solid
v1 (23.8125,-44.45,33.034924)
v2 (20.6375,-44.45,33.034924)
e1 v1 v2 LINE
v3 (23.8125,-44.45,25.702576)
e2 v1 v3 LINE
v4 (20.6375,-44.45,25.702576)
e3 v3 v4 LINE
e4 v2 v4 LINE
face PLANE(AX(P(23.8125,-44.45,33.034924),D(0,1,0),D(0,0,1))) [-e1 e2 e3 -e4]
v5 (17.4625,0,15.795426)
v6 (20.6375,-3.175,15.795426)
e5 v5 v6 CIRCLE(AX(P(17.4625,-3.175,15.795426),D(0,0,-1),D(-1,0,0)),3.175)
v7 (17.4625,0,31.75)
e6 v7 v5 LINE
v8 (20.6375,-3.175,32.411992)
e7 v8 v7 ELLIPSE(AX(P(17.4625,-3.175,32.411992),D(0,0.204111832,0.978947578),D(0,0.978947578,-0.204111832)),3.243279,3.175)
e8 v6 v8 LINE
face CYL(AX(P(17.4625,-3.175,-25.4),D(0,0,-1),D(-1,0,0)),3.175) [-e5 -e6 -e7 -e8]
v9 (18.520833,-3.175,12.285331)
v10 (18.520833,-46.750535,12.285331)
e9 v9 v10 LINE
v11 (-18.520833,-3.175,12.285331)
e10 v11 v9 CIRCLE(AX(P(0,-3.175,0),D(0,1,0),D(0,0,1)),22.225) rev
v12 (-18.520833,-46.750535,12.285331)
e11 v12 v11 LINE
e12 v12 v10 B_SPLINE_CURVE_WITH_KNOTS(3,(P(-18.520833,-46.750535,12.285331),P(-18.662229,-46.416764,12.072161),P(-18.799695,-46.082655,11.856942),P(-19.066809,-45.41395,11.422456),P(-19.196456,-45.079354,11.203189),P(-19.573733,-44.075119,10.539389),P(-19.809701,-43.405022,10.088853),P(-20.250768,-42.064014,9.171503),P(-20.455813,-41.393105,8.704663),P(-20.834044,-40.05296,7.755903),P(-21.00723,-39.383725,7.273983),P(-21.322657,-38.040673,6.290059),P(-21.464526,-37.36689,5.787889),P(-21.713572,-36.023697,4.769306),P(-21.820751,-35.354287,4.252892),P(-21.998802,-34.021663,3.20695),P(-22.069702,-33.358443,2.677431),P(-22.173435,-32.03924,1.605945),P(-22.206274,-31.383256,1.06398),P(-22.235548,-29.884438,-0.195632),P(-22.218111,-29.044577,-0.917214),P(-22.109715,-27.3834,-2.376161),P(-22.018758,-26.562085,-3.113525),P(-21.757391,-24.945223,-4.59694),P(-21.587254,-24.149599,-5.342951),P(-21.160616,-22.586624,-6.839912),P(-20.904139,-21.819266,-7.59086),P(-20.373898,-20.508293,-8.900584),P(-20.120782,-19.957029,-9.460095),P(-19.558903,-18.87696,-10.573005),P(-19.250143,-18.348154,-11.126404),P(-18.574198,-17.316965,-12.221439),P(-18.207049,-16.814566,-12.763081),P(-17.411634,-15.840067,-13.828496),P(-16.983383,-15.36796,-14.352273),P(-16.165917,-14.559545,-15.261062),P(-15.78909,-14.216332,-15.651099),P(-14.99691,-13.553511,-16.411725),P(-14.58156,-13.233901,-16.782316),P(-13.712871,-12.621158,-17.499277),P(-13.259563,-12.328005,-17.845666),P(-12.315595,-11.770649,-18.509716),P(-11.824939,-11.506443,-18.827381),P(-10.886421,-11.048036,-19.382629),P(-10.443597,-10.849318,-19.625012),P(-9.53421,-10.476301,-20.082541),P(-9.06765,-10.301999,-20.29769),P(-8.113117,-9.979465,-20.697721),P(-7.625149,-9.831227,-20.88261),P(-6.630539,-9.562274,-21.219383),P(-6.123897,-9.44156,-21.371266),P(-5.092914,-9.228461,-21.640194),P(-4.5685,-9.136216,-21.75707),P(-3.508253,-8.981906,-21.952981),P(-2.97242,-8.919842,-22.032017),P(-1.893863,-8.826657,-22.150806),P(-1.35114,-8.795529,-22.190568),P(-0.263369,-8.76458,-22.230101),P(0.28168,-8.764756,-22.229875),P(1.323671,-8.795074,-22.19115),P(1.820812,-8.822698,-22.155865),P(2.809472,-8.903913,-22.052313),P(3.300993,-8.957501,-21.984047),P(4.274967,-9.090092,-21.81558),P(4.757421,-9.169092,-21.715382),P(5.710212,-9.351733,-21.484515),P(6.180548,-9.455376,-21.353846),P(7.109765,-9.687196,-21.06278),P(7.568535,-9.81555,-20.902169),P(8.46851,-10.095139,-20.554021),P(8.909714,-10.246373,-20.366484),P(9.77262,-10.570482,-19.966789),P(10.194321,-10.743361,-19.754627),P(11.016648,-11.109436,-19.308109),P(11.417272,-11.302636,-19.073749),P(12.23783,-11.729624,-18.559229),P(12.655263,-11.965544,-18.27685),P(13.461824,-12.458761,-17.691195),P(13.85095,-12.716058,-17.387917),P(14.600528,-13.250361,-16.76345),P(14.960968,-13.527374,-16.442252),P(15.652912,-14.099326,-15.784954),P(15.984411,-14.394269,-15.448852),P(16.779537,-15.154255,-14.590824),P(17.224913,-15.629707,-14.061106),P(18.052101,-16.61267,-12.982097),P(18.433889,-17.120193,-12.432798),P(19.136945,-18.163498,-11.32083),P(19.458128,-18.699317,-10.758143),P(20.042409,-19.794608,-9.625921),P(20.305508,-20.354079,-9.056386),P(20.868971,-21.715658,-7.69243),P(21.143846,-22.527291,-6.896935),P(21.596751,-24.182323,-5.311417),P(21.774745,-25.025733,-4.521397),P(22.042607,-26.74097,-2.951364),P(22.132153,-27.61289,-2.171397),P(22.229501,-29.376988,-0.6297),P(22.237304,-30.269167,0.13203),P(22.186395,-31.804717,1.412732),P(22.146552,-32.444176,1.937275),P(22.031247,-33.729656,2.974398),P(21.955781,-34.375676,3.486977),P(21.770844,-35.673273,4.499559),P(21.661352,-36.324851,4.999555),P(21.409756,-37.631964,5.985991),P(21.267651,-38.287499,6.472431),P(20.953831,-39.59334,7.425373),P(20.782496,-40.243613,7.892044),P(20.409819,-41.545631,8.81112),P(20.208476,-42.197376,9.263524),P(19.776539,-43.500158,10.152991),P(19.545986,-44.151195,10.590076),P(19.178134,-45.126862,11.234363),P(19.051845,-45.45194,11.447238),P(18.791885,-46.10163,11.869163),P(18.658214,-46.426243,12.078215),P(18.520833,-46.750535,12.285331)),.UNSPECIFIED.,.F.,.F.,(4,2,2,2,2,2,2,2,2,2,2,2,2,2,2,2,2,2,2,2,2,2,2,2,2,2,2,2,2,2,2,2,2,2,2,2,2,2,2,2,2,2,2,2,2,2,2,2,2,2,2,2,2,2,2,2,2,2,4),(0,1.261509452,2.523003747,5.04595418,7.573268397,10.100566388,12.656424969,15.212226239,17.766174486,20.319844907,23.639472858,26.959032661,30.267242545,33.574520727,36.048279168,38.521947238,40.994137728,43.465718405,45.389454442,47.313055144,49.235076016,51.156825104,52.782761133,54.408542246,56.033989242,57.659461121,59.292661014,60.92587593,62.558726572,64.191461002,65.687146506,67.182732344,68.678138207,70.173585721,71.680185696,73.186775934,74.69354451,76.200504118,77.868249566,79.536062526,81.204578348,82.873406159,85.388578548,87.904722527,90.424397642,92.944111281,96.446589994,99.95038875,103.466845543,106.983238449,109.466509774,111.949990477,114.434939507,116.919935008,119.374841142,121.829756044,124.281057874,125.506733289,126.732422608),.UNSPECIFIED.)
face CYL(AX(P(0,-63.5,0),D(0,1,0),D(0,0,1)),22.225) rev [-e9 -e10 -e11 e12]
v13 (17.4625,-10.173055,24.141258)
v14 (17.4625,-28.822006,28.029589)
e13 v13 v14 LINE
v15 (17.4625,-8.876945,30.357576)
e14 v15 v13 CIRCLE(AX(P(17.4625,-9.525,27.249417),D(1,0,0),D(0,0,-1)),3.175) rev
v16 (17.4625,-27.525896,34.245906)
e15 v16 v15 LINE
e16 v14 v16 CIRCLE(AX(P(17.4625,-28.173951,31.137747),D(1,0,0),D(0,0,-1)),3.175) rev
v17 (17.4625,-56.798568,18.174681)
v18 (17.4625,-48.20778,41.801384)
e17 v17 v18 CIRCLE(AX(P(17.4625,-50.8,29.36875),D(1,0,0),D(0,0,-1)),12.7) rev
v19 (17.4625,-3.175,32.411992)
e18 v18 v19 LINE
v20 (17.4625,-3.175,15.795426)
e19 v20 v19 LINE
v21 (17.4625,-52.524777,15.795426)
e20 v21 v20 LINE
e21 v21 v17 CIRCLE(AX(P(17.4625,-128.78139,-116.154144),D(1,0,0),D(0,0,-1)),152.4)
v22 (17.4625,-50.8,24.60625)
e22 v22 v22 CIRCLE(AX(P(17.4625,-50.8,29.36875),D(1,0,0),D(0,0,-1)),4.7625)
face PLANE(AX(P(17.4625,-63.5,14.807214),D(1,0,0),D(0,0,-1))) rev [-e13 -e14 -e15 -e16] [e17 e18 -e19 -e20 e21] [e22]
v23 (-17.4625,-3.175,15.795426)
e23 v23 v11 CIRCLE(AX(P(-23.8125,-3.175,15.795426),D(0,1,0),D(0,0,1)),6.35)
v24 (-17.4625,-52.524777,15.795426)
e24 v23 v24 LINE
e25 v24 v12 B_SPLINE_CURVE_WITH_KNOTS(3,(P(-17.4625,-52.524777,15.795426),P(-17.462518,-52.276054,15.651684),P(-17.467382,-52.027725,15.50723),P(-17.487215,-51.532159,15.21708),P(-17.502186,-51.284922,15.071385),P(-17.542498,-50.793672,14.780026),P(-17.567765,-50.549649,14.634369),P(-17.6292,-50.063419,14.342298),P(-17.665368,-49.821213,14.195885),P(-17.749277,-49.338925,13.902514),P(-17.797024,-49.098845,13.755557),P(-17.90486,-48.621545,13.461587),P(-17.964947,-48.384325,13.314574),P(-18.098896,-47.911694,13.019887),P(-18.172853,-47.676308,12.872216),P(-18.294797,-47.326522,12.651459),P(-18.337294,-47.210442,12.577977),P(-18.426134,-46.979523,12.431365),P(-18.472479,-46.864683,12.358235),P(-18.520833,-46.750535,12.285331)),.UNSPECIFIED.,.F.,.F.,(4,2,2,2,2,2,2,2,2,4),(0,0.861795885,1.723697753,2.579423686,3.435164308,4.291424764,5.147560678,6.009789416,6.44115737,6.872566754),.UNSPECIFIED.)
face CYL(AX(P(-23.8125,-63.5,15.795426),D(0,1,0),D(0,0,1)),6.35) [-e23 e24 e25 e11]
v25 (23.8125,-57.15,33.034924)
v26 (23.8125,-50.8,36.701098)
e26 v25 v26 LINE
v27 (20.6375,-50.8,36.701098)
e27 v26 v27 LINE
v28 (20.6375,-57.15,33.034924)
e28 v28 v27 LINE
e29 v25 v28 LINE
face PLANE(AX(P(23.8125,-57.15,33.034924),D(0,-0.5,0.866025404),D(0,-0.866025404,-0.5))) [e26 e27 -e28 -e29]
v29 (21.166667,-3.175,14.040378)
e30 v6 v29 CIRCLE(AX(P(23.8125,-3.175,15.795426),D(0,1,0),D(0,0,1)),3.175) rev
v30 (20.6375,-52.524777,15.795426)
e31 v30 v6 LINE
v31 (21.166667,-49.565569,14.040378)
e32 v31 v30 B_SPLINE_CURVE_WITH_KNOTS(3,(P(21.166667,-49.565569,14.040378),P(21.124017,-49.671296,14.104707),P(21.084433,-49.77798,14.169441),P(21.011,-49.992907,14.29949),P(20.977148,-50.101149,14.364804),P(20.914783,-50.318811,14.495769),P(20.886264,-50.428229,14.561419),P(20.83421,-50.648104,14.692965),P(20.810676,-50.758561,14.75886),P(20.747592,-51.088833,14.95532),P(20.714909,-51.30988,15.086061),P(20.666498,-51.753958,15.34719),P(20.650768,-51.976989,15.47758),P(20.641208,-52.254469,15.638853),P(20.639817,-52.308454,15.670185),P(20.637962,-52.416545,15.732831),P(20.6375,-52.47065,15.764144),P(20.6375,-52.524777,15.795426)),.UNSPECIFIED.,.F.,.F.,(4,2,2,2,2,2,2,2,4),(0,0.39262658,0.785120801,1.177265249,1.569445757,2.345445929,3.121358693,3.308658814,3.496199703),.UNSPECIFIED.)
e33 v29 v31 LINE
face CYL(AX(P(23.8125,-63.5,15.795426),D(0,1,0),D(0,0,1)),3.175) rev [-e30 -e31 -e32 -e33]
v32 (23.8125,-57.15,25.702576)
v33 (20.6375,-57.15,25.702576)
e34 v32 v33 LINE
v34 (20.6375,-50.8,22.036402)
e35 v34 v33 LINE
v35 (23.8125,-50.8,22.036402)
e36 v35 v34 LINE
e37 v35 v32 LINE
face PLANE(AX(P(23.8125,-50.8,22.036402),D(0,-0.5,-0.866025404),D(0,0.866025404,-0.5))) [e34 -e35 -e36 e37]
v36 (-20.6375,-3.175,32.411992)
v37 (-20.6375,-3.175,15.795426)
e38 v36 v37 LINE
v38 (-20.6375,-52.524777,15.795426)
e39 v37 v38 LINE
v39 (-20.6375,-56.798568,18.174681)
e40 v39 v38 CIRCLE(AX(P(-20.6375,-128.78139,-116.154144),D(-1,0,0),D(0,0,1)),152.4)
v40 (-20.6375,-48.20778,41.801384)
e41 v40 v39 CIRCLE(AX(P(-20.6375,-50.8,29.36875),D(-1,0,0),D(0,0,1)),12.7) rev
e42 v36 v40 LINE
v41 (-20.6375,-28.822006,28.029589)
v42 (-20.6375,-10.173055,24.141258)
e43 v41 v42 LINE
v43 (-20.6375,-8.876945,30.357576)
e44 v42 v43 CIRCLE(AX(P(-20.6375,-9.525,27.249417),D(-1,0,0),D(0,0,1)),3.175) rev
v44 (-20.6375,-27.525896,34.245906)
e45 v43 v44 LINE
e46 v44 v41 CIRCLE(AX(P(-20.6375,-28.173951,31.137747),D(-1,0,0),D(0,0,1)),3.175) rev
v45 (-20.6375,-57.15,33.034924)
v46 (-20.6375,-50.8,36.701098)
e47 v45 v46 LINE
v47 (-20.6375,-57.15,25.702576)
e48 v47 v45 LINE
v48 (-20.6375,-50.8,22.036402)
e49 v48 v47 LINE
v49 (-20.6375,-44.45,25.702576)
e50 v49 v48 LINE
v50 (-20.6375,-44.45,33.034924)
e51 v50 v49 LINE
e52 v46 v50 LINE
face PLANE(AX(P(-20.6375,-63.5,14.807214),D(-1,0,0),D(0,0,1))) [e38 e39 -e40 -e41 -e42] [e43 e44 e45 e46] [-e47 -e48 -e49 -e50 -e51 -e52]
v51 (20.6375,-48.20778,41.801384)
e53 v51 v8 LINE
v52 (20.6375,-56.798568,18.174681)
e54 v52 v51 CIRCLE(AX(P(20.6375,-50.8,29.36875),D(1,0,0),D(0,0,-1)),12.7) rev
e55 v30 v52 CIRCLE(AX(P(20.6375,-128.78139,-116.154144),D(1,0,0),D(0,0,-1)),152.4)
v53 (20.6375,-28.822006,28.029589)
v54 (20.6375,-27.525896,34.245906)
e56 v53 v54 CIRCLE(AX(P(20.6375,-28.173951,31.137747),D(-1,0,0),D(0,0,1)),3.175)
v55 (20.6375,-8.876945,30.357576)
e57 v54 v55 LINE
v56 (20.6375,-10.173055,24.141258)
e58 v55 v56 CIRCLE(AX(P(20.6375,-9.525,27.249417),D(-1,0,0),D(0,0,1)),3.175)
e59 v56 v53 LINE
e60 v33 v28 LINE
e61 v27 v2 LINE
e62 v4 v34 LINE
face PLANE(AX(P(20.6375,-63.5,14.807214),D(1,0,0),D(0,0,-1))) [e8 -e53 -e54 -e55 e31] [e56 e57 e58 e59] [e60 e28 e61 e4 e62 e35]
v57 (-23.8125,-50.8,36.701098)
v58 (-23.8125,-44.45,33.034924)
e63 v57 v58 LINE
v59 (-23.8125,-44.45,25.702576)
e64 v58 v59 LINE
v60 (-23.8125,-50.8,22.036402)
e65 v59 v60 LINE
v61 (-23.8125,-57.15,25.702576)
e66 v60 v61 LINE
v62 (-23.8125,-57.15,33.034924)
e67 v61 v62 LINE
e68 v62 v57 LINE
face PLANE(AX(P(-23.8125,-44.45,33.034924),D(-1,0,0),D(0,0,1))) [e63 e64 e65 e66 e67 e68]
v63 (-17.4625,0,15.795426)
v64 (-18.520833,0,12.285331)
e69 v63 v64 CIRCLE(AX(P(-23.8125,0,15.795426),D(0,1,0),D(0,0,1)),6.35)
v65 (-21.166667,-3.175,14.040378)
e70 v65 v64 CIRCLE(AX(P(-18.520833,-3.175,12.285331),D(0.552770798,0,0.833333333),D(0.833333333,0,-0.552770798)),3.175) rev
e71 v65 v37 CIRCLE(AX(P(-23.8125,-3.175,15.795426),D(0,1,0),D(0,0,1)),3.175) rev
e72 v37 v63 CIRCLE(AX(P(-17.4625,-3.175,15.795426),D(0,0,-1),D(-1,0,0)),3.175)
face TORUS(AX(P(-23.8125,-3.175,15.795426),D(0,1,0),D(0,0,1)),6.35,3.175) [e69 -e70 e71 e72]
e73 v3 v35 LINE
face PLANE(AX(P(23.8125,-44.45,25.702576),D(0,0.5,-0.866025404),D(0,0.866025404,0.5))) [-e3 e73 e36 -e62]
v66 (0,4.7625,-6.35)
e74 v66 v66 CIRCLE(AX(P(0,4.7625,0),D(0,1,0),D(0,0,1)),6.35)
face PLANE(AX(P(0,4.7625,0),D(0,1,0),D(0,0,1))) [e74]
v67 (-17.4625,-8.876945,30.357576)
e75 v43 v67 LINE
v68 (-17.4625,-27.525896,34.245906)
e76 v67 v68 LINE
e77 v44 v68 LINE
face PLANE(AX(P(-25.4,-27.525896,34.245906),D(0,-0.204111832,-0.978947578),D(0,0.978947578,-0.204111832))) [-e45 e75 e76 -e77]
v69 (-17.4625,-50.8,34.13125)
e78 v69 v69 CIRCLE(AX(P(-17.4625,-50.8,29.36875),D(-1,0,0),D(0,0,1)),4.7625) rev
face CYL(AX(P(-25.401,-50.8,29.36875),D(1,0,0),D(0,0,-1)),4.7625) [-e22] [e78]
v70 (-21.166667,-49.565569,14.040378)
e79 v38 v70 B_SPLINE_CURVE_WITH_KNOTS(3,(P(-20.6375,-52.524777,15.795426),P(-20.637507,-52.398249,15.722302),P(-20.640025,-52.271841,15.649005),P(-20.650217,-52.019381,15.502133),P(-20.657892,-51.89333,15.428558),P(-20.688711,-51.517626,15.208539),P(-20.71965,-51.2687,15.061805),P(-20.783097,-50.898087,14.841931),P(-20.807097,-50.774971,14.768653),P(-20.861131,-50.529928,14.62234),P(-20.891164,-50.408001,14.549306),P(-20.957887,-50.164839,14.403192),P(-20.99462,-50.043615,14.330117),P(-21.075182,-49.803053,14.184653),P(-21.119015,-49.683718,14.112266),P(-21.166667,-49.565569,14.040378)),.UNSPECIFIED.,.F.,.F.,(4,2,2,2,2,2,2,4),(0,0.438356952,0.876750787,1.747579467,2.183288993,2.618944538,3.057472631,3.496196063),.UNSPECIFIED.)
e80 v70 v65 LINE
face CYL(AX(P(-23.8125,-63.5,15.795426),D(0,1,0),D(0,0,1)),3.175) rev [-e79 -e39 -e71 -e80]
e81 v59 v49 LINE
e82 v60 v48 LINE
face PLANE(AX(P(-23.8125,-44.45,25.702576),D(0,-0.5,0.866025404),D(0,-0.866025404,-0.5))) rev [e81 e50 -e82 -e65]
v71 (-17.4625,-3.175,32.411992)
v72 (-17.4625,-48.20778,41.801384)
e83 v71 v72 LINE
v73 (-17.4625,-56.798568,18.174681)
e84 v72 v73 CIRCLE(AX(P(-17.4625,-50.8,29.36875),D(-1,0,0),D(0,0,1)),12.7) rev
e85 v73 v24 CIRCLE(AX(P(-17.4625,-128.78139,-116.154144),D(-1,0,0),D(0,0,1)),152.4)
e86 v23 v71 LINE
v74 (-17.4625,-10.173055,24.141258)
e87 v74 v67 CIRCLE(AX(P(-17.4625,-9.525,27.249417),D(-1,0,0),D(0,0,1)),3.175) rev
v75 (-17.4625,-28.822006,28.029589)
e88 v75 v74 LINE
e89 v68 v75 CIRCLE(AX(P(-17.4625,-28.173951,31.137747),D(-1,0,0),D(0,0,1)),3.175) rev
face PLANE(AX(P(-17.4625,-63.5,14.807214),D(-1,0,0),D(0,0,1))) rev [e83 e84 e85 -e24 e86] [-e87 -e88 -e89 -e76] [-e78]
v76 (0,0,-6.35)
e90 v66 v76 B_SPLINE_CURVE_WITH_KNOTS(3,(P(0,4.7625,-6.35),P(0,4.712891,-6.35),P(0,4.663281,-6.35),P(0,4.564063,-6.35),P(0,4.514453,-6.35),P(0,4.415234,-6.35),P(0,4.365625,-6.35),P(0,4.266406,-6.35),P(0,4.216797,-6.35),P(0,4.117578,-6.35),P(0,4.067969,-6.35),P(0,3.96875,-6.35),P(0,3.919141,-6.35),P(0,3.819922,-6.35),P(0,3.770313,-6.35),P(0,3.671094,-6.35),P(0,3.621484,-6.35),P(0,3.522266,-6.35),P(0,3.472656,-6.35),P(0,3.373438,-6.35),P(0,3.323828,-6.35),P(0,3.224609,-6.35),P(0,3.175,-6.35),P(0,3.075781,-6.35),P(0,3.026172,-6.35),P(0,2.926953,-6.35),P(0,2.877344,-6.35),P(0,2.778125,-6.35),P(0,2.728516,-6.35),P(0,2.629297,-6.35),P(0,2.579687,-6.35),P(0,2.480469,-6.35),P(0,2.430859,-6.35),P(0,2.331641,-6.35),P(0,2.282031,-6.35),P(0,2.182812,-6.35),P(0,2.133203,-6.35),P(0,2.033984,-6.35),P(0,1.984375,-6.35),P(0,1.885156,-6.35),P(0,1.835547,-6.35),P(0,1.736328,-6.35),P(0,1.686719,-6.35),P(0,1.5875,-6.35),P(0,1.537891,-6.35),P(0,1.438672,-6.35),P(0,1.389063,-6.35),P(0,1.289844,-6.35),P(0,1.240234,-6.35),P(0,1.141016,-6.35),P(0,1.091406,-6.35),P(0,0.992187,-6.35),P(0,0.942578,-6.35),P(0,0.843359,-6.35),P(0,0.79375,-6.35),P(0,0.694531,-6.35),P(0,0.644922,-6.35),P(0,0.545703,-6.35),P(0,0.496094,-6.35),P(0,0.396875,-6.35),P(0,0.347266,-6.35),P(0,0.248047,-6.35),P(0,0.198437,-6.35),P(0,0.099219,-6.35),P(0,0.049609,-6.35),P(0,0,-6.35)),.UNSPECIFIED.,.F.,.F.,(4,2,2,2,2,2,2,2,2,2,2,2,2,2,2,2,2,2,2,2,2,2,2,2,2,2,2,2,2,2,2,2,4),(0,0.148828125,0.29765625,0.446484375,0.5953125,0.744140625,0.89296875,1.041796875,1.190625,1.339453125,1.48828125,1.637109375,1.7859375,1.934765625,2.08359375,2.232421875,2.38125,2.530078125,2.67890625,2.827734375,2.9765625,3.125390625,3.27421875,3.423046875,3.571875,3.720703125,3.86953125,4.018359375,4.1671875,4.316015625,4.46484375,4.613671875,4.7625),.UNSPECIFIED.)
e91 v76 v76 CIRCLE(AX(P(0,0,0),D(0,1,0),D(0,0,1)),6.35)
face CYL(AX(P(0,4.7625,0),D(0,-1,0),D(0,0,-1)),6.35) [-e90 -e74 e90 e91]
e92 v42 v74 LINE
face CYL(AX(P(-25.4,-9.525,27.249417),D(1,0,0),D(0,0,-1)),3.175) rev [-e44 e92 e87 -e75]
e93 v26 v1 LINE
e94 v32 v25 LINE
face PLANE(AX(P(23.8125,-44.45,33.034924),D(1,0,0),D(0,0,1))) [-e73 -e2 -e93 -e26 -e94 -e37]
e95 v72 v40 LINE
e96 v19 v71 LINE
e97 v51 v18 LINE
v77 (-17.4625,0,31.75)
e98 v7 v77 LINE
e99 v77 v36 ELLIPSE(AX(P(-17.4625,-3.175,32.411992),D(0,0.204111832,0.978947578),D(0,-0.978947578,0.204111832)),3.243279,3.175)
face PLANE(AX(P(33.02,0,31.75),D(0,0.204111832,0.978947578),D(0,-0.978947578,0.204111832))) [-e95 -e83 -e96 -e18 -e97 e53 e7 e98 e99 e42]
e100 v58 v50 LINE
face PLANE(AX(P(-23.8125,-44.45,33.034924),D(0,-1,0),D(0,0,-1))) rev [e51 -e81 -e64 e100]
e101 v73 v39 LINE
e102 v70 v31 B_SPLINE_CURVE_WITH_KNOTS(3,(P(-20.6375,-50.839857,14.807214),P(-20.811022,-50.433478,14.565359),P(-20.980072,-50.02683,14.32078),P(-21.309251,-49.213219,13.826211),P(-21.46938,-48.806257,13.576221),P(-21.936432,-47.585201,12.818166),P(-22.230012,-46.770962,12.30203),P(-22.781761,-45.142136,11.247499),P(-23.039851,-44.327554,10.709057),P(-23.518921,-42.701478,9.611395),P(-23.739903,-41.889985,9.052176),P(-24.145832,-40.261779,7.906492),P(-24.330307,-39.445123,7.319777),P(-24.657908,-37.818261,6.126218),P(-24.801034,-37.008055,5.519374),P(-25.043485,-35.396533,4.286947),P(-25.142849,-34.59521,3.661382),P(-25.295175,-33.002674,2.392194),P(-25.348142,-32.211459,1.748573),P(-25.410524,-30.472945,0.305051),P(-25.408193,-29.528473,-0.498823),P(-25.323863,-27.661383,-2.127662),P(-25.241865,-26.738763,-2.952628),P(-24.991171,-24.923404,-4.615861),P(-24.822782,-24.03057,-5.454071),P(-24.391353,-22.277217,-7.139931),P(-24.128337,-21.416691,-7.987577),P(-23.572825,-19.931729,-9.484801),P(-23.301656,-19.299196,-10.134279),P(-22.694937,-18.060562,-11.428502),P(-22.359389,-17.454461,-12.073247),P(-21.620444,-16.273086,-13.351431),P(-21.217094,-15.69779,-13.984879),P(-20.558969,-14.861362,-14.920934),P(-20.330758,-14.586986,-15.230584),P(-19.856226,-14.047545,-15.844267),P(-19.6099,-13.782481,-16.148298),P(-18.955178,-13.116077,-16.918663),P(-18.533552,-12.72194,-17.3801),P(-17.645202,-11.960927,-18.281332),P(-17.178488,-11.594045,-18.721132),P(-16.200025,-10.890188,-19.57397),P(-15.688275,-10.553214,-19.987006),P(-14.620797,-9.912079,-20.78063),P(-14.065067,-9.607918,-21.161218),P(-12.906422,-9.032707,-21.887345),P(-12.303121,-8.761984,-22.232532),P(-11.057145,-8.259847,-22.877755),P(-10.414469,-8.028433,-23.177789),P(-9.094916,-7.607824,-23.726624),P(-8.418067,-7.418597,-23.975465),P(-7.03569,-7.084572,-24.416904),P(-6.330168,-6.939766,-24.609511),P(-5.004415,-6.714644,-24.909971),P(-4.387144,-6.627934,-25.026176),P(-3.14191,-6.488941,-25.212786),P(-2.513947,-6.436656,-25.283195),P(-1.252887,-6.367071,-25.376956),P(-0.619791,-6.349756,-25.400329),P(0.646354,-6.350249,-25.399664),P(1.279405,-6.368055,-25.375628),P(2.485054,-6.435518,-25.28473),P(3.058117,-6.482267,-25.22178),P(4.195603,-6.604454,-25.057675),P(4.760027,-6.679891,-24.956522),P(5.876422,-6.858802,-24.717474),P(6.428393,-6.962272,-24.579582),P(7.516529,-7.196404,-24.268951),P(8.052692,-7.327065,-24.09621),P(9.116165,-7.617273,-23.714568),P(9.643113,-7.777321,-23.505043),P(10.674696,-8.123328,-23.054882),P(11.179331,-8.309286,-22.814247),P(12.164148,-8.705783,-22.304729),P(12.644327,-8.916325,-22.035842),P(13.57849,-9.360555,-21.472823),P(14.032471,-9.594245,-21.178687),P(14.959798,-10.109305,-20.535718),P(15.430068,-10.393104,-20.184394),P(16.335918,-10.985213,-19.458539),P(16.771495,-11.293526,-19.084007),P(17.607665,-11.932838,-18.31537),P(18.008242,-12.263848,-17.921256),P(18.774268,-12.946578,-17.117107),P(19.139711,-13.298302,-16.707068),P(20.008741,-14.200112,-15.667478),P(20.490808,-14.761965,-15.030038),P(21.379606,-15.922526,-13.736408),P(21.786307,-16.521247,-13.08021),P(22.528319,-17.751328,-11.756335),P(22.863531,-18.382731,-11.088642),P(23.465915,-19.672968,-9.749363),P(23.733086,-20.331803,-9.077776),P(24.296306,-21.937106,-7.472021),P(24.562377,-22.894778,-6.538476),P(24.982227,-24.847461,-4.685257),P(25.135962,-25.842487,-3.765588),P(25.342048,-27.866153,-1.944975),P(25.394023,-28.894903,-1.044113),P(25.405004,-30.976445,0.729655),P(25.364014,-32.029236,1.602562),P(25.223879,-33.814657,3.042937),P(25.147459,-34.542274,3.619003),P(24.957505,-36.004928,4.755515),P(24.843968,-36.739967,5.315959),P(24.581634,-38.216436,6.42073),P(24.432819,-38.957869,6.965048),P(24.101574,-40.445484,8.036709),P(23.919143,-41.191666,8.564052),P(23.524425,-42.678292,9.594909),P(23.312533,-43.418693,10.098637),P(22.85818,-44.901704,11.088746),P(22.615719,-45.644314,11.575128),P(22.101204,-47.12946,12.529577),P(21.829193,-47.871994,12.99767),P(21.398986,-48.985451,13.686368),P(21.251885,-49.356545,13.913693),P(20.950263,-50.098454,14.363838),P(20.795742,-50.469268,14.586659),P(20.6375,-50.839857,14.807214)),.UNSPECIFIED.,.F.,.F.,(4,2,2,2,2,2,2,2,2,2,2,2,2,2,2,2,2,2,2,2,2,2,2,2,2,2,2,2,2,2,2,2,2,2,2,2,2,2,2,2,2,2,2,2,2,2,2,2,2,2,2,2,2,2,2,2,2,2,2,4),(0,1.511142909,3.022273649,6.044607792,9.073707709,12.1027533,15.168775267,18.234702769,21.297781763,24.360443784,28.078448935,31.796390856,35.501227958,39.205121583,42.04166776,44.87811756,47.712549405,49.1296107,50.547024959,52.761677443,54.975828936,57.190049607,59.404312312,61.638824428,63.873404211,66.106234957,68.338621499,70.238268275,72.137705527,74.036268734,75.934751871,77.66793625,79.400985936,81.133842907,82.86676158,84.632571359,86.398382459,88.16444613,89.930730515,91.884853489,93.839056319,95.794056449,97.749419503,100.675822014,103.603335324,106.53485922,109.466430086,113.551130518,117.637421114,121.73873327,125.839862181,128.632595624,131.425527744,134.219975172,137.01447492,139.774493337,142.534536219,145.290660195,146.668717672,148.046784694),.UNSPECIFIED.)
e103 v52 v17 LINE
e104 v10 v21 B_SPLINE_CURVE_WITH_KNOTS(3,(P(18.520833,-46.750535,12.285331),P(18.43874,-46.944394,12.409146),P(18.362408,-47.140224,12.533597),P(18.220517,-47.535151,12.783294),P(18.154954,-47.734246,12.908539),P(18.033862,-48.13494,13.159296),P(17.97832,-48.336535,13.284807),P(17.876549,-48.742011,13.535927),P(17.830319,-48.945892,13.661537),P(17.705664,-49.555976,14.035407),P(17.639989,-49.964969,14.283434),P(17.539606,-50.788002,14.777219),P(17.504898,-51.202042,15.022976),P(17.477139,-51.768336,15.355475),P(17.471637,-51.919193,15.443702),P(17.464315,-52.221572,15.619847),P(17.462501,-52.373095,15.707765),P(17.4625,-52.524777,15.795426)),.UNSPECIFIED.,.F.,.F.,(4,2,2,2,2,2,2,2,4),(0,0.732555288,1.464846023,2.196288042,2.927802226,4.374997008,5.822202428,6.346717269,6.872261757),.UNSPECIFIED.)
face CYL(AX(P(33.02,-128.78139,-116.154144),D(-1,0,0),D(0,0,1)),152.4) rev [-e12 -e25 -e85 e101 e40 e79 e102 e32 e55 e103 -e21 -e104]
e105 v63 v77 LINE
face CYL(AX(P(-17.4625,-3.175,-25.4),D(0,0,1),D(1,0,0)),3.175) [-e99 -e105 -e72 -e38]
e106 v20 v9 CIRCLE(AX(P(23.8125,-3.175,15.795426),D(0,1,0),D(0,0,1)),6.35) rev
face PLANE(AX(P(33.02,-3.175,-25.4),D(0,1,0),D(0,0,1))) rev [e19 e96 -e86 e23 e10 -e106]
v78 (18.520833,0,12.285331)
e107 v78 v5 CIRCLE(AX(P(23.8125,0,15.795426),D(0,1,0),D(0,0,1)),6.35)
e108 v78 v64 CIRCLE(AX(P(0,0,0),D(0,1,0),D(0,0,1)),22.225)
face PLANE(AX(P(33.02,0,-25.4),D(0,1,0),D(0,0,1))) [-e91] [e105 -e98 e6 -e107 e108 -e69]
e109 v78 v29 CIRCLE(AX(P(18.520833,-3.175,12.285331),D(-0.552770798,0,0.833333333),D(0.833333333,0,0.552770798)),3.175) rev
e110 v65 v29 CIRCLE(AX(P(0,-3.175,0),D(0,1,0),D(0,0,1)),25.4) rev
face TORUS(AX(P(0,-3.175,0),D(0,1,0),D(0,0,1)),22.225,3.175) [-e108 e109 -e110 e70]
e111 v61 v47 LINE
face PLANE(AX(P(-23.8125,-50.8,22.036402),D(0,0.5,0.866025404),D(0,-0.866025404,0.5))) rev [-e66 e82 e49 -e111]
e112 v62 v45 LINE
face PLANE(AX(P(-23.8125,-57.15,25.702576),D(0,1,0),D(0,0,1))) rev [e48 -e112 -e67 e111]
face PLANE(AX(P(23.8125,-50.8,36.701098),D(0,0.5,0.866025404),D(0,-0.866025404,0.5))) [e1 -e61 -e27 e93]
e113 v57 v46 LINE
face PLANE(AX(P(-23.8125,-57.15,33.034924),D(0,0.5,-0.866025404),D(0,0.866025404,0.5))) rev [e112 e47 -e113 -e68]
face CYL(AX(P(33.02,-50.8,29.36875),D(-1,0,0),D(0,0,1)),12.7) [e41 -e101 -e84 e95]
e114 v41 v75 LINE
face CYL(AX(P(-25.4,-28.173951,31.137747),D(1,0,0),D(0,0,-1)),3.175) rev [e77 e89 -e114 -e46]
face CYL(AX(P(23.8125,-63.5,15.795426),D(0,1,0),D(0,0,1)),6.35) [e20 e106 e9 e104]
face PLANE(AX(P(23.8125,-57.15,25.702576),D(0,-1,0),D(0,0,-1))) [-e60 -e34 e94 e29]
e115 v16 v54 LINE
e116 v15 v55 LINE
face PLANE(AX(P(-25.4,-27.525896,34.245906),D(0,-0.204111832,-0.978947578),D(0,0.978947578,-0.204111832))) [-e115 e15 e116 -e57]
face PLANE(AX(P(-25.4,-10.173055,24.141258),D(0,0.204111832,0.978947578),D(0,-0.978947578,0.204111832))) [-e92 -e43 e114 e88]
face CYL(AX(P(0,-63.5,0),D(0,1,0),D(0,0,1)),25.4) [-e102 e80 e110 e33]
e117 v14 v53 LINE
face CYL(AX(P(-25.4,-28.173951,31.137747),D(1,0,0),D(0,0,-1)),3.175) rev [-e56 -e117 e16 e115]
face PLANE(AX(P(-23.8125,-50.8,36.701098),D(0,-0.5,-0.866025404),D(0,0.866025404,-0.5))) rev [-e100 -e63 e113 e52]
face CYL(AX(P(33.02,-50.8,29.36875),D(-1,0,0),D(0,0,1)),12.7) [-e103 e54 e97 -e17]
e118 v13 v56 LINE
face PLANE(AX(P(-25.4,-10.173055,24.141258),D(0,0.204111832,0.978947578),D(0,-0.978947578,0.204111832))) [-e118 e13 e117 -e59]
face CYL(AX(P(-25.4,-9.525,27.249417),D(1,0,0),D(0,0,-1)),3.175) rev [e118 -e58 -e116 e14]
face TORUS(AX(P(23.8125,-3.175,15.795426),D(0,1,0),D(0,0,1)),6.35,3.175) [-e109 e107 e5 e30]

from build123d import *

# Parameters (mm, degrees)
BASE_EXTRUDE_DEPTH              = 33.02
SKETCH3_OUTSIDE_W               = 90.796
SKETCH3_OUTSIDE_H               = 92.225
CUT_EXTRUDE1_DEPTH              = 84.020179032
FILLET1_R                       = 3.175
SHELL1_START                    = -64
SHELL1_DEPTH                    = 60.825
CUT_EXTRUDE2_DEPTH              = 90.002703004
BOSS_EXTRUDE2_REACH             = 82.294
SKETCH5_R                       = 4.7625
BOSS_EXTRUDE2_DIRECTION_2_REACH = 82.294
BOSS_EXTRUDE3_DEPTH             = 3.175
SKETCH7_R                       = 6.35
BOSS_EXTRUDE4_DEPTH             = 4.7625


with BuildPart() as part:
    # Sketch2 → Base-Extrude (new, symmetric)
    with BuildSketch(Plane.ZY):
        with BuildLine():
            Line((-25.4, 0), (31.75, 0))
            Line((31.75, 0), (41.801384237, -48.20777973))
            ThreePointArc((41.801384237, -48.20777973), (33.708556891, -62.735496477), (18.174681196, -56.798568464))
            ThreePointArc((18.174681196, -56.798568464), (-0.820496403, -29.162568375), (-25.4, -6.35))
            Line((-25.4, -6.35), (-25.4, 0))
        make_face()
    extrude(amount=BASE_EXTRUDE_DEPTH, both=True)

    # Sketch3 outside → Cut-Extrude1 (cut, through all)
    with BuildSketch(Plane(origin=(0, 0, 0), x_dir=(-1, 0, 0), z_dir=(0, 1, 0))):
        with Locations((0, 8.3345)):
            Rectangle(SKETCH3_OUTSIDE_W, SKETCH3_OUTSIDE_H)
        with BuildLine():
            Line((20.6375, 14.807214247), (20.6375, 48.151384237))
            Line((20.6375, 48.151384237), (-20.6375, 48.151384237))
            Line((-20.6375, 48.151384237), (-20.6375, 14.807214247))
            ThreePointArc((-20.6375, 14.807214247), (0, -25.4), (20.6375, 14.807214247))
        make_face(mode=Mode.SUBTRACT)
    extrude(amount=-CUT_EXTRUDE1_DEPTH, mode=Mode.SUBTRACT)

    # Fillet1
    # the kernel refuses this fillet: 3.175 mm, written as the material it adds along each edge
    with BuildSketch(Plane(origin=(20.6375, 0, 14.807214247), x_dir=(0.567961525786319, 0, -0.8230551046111534), z_dir=(0, -1, 0))) as fillet1_piece_1_section:
        with BuildLine():
            CenterArc((0.989925475, 3.174465965), FILLET1_R, 235.391801271, 33.557309762)
            Line((-0.813352369, 0.561266008), (0, 0))
            ThreePointArc((0, 0), (0.465847282, 0.004272282), (0.931694565, 0))
        make_face()
    fillet1_piece_1 = extrude(amount=53.310385567, mode=Mode.PRIVATE)
    fillet1_piece_1 = fillet1_piece_1 - Plane(origin=(20.6375, -128.781390034, -116.154144448), x_dir=(0, 0.4723282255219985, 0.8814227404459453), z_dir=(-1, 0, 0)) * Cylinder(152.4, 111, mode=Mode.PRIVATE)
    add(fillet1_piece_1)
    with BuildSketch(Plane(origin=(-20.6375, 0, 14.807214247), x_dir=(-0.5679615257863165, 0, -0.8230551046111549), z_dir=(0, -1, 0))) as fillet1_piece_2_section:
        with BuildLine():
            CenterArc((0.989925475, -3.174465965), FILLET1_R, 91.050888967, 33.557309762)
            Line((-0.813352369, -0.561266008), (0, 0))
            ThreePointArc((0, 0), (0.465847282, -0.004272282), (0.931694565, 0))
        make_face()
    fillet1_piece_2 = extrude(amount=53.310385567, mode=Mode.PRIVATE)
    fillet1_piece_2 = fillet1_piece_2 - Plane(origin=(-20.6375, -128.781390034, -116.154144448), x_dir=(0, 0.4723282255219985, 0.8814227404459453), z_dir=(-1, 0, 0)) * Cylinder(152.4, 111, mode=Mode.PRIVATE)
    add(fillet1_piece_2)
    # the kernel refuses this fillet: 3.175 mm, written as the material it takes off along each edge
    with BuildSketch(Plane(origin=(0, 0, 0), x_dir=(-0.8333333333333335, 0, 0.5527707983925666), z_dir=(0.5527707983925666, 0, 0.8333333333333335))) as fillet1_2_piece_1:
        with BuildLine():
            CenterArc((25.4 - FILLET1_R, FILLET1_R), FILLET1_R, 270, 90)
            Line((25.4 - FILLET1_R, 0), (25.4, 0))
            Line((25.4, 0), (25.4, FILLET1_R))
        make_face()
    revolve(axis=Axis((0, 0, 0), (0, -1, 0)), revolution_arc=247.114619524, mode=Mode.SUBTRACT)
    with BuildSketch(Plane(origin=(20.6375, 0, 39.6875), x_dir=(-1, 0, 0), z_dir=(0, 0, -1)), Plane(origin=(-20.6375, 0, 15.795425564), x_dir=(1, 0, 0), z_dir=(0, 0, 1))) as fillet1_2_piece_2:
        with BuildLine():
            CenterArc((FILLET1_R, -FILLET1_R), FILLET1_R, 90, 90)
            Line((0, -FILLET1_R), (0, 0))
            Line((0, 0), (FILLET1_R, 0))
        make_face()
    extrude(amount=23.892074436, mode=Mode.SUBTRACT)
    with BuildSketch(Plane(origin=(-23.8125, 0, 15.795425564), x_dir=(0.8333333333333333, 0, -0.5527707983925668), z_dir=(-0.5527707983925668, 0, -0.8333333333333333))) as fillet1_2_piece_3:
        with BuildLine():
            CenterArc((3.175 + FILLET1_R, FILLET1_R), FILLET1_R, 180, 90)
            Line((3.175, FILLET1_R), (3.175, 0))
            Line((3.175, 0), (3.175 + FILLET1_R, 0))
        make_face()
    revolve(axis=Axis((-23.8125, 0, 15.795425564), (0, -1, 0)), revolution_arc=33.557309762, mode=Mode.SUBTRACT)
    with BuildSketch(Plane(origin=(23.8125, 0, 15.795425564), x_dir=(-0.8333333333333333, 0, -0.5527707983925668), z_dir=(0.5527707983925668, 0, -0.8333333333333333))) as fillet1_2_piece_4:
        with BuildLine():
            CenterArc((3.175 + FILLET1_R, -FILLET1_R), FILLET1_R, 90, 90)
            Line((3.175, -FILLET1_R), (3.175, 0))
            Line((3.175, 0), (3.175 + FILLET1_R, 0))
        make_face()
    revolve(axis=Axis((23.8125, 0, 15.795425564), (0, 1, 0)), revolution_arc=33.557309762, mode=Mode.SUBTRACT)

    # Shell1: read off the stored shape, not the designer's step
    # Shell1 outline → Shell1 (cut)
    with BuildSketch(Plane(origin=(0, 0, 0), x_dir=(1, 0, 0), z_dir=(0, 1, 0)).offset(SHELL1_START)):
        with BuildLine():
            ThreePointArc((17.4625, -15.795425564), (17.732837866, -13.962338459), (18.520833333, -12.285330994))
            ThreePointArc((18.520833333, -12.285330994), (0, 22.225), (-18.520833333, -12.285330994))
            ThreePointArc((-18.520833333, -12.285330994), (-17.732837866, -13.962338459), (-17.4625, -15.795425564))
            Line((-17.4625, -15.795425564), (-17.4625, -44))
            Line((-17.4625, -44), (17.4625, -44))
            Line((17.4625, -44), (17.4625, -15.795425564))
        make_face()
    extrude(amount=SHELL1_DEPTH, mode=Mode.SUBTRACT)

    # Sketch4 → Cut-Extrude2 (cut, through all)
    with BuildSketch(Plane.ZY.offset(-20.6375)):
        with BuildLine():
            Line((24.14125847, -10.173055068), (28.029588875, -28.822006423))
            ThreePointArc((28.029588875, -28.822006423), (31.785802502, -31.282109915), (34.245905994, -27.525896288))
            Line((34.245905994, -27.525896288), (30.357575589, -8.876944932))
            ThreePointArc((30.357575589, -8.876944932), (26.601361962, -6.416841441), (24.14125847, -10.173055068))
        make_face()
    extrude(amount=CUT_EXTRUDE2_DEPTH, mode=Mode.SUBTRACT)

    # Sketch5 → Boss-Extrude2 (add, up to next)
    with BuildSketch(Plane(origin=(0, 0, 0), x_dir=(0, 0, -1), z_dir=(1, 0, 0)), mode=Mode.PRIVATE) as boss_extrude2_sk1:
        with Locations((-29.36875, -50.8)):
            Circle(SKETCH5_R)
    boss_extrude2_tool1 = extrude(boss_extrude2_sk1.sketch, amount=BOSS_EXTRUDE2_REACH, mode=Mode.PRIVATE) - part.part
    add(boss_extrude2_tool1.solids().sort_by_distance((0, -50.8, 29.36875))[0])

    # Sketch5 → Boss-Extrude2 direction 2 (add, up to next)
    with BuildSketch(Plane(origin=(0, 0, 0), x_dir=(0, 0, -1), z_dir=(1, 0, 0)), mode=Mode.PRIVATE) as boss_extrude2_direction_2_sk1:
        with Locations((-29.36875, -50.8)):
            Circle(SKETCH5_R)
    boss_extrude2_direction_2_tool1 = extrude(boss_extrude2_direction_2_sk1.sketch, amount=-BOSS_EXTRUDE2_DIRECTION_2_REACH, mode=Mode.PRIVATE) - part.part
    add(boss_extrude2_direction_2_tool1.solids().sort_by_distance((0, -50.8, 29.36875))[0])

    # Sketch6 → Boss-Extrude3 (add)
    with BuildSketch(Plane.ZY.offset(20.6375)):
        Polygon((33.034924209, -44.45), (25.702575791, -44.45), (22.036401581, -50.8), (25.702575791, -57.15), (33.034924209, -57.15), (36.701098419, -50.8), align=None)
    boss_extrude3 = extrude(amount=BOSS_EXTRUDE3_DEPTH)

    # Mirror1: Boss-Extrude3 across plane
    add(boss_extrude3.mirror(Plane(origin=(0, 0, 0), x_dir=(0, 0, 1), z_dir=(1, 0, 0))))

    # Sketch7 → Boss-Extrude4 (add)
    with BuildSketch(Plane(origin=(0, 0, 0), x_dir=(-1, 0, 0), z_dir=(0, 1, 0))):
        with Locations(Location((0, 0, 0), (0, 0, 270))):
            Circle(SKETCH7_R)
    extrude(amount=BOSS_EXTRUDE4_DEPTH)


solid = part.part
